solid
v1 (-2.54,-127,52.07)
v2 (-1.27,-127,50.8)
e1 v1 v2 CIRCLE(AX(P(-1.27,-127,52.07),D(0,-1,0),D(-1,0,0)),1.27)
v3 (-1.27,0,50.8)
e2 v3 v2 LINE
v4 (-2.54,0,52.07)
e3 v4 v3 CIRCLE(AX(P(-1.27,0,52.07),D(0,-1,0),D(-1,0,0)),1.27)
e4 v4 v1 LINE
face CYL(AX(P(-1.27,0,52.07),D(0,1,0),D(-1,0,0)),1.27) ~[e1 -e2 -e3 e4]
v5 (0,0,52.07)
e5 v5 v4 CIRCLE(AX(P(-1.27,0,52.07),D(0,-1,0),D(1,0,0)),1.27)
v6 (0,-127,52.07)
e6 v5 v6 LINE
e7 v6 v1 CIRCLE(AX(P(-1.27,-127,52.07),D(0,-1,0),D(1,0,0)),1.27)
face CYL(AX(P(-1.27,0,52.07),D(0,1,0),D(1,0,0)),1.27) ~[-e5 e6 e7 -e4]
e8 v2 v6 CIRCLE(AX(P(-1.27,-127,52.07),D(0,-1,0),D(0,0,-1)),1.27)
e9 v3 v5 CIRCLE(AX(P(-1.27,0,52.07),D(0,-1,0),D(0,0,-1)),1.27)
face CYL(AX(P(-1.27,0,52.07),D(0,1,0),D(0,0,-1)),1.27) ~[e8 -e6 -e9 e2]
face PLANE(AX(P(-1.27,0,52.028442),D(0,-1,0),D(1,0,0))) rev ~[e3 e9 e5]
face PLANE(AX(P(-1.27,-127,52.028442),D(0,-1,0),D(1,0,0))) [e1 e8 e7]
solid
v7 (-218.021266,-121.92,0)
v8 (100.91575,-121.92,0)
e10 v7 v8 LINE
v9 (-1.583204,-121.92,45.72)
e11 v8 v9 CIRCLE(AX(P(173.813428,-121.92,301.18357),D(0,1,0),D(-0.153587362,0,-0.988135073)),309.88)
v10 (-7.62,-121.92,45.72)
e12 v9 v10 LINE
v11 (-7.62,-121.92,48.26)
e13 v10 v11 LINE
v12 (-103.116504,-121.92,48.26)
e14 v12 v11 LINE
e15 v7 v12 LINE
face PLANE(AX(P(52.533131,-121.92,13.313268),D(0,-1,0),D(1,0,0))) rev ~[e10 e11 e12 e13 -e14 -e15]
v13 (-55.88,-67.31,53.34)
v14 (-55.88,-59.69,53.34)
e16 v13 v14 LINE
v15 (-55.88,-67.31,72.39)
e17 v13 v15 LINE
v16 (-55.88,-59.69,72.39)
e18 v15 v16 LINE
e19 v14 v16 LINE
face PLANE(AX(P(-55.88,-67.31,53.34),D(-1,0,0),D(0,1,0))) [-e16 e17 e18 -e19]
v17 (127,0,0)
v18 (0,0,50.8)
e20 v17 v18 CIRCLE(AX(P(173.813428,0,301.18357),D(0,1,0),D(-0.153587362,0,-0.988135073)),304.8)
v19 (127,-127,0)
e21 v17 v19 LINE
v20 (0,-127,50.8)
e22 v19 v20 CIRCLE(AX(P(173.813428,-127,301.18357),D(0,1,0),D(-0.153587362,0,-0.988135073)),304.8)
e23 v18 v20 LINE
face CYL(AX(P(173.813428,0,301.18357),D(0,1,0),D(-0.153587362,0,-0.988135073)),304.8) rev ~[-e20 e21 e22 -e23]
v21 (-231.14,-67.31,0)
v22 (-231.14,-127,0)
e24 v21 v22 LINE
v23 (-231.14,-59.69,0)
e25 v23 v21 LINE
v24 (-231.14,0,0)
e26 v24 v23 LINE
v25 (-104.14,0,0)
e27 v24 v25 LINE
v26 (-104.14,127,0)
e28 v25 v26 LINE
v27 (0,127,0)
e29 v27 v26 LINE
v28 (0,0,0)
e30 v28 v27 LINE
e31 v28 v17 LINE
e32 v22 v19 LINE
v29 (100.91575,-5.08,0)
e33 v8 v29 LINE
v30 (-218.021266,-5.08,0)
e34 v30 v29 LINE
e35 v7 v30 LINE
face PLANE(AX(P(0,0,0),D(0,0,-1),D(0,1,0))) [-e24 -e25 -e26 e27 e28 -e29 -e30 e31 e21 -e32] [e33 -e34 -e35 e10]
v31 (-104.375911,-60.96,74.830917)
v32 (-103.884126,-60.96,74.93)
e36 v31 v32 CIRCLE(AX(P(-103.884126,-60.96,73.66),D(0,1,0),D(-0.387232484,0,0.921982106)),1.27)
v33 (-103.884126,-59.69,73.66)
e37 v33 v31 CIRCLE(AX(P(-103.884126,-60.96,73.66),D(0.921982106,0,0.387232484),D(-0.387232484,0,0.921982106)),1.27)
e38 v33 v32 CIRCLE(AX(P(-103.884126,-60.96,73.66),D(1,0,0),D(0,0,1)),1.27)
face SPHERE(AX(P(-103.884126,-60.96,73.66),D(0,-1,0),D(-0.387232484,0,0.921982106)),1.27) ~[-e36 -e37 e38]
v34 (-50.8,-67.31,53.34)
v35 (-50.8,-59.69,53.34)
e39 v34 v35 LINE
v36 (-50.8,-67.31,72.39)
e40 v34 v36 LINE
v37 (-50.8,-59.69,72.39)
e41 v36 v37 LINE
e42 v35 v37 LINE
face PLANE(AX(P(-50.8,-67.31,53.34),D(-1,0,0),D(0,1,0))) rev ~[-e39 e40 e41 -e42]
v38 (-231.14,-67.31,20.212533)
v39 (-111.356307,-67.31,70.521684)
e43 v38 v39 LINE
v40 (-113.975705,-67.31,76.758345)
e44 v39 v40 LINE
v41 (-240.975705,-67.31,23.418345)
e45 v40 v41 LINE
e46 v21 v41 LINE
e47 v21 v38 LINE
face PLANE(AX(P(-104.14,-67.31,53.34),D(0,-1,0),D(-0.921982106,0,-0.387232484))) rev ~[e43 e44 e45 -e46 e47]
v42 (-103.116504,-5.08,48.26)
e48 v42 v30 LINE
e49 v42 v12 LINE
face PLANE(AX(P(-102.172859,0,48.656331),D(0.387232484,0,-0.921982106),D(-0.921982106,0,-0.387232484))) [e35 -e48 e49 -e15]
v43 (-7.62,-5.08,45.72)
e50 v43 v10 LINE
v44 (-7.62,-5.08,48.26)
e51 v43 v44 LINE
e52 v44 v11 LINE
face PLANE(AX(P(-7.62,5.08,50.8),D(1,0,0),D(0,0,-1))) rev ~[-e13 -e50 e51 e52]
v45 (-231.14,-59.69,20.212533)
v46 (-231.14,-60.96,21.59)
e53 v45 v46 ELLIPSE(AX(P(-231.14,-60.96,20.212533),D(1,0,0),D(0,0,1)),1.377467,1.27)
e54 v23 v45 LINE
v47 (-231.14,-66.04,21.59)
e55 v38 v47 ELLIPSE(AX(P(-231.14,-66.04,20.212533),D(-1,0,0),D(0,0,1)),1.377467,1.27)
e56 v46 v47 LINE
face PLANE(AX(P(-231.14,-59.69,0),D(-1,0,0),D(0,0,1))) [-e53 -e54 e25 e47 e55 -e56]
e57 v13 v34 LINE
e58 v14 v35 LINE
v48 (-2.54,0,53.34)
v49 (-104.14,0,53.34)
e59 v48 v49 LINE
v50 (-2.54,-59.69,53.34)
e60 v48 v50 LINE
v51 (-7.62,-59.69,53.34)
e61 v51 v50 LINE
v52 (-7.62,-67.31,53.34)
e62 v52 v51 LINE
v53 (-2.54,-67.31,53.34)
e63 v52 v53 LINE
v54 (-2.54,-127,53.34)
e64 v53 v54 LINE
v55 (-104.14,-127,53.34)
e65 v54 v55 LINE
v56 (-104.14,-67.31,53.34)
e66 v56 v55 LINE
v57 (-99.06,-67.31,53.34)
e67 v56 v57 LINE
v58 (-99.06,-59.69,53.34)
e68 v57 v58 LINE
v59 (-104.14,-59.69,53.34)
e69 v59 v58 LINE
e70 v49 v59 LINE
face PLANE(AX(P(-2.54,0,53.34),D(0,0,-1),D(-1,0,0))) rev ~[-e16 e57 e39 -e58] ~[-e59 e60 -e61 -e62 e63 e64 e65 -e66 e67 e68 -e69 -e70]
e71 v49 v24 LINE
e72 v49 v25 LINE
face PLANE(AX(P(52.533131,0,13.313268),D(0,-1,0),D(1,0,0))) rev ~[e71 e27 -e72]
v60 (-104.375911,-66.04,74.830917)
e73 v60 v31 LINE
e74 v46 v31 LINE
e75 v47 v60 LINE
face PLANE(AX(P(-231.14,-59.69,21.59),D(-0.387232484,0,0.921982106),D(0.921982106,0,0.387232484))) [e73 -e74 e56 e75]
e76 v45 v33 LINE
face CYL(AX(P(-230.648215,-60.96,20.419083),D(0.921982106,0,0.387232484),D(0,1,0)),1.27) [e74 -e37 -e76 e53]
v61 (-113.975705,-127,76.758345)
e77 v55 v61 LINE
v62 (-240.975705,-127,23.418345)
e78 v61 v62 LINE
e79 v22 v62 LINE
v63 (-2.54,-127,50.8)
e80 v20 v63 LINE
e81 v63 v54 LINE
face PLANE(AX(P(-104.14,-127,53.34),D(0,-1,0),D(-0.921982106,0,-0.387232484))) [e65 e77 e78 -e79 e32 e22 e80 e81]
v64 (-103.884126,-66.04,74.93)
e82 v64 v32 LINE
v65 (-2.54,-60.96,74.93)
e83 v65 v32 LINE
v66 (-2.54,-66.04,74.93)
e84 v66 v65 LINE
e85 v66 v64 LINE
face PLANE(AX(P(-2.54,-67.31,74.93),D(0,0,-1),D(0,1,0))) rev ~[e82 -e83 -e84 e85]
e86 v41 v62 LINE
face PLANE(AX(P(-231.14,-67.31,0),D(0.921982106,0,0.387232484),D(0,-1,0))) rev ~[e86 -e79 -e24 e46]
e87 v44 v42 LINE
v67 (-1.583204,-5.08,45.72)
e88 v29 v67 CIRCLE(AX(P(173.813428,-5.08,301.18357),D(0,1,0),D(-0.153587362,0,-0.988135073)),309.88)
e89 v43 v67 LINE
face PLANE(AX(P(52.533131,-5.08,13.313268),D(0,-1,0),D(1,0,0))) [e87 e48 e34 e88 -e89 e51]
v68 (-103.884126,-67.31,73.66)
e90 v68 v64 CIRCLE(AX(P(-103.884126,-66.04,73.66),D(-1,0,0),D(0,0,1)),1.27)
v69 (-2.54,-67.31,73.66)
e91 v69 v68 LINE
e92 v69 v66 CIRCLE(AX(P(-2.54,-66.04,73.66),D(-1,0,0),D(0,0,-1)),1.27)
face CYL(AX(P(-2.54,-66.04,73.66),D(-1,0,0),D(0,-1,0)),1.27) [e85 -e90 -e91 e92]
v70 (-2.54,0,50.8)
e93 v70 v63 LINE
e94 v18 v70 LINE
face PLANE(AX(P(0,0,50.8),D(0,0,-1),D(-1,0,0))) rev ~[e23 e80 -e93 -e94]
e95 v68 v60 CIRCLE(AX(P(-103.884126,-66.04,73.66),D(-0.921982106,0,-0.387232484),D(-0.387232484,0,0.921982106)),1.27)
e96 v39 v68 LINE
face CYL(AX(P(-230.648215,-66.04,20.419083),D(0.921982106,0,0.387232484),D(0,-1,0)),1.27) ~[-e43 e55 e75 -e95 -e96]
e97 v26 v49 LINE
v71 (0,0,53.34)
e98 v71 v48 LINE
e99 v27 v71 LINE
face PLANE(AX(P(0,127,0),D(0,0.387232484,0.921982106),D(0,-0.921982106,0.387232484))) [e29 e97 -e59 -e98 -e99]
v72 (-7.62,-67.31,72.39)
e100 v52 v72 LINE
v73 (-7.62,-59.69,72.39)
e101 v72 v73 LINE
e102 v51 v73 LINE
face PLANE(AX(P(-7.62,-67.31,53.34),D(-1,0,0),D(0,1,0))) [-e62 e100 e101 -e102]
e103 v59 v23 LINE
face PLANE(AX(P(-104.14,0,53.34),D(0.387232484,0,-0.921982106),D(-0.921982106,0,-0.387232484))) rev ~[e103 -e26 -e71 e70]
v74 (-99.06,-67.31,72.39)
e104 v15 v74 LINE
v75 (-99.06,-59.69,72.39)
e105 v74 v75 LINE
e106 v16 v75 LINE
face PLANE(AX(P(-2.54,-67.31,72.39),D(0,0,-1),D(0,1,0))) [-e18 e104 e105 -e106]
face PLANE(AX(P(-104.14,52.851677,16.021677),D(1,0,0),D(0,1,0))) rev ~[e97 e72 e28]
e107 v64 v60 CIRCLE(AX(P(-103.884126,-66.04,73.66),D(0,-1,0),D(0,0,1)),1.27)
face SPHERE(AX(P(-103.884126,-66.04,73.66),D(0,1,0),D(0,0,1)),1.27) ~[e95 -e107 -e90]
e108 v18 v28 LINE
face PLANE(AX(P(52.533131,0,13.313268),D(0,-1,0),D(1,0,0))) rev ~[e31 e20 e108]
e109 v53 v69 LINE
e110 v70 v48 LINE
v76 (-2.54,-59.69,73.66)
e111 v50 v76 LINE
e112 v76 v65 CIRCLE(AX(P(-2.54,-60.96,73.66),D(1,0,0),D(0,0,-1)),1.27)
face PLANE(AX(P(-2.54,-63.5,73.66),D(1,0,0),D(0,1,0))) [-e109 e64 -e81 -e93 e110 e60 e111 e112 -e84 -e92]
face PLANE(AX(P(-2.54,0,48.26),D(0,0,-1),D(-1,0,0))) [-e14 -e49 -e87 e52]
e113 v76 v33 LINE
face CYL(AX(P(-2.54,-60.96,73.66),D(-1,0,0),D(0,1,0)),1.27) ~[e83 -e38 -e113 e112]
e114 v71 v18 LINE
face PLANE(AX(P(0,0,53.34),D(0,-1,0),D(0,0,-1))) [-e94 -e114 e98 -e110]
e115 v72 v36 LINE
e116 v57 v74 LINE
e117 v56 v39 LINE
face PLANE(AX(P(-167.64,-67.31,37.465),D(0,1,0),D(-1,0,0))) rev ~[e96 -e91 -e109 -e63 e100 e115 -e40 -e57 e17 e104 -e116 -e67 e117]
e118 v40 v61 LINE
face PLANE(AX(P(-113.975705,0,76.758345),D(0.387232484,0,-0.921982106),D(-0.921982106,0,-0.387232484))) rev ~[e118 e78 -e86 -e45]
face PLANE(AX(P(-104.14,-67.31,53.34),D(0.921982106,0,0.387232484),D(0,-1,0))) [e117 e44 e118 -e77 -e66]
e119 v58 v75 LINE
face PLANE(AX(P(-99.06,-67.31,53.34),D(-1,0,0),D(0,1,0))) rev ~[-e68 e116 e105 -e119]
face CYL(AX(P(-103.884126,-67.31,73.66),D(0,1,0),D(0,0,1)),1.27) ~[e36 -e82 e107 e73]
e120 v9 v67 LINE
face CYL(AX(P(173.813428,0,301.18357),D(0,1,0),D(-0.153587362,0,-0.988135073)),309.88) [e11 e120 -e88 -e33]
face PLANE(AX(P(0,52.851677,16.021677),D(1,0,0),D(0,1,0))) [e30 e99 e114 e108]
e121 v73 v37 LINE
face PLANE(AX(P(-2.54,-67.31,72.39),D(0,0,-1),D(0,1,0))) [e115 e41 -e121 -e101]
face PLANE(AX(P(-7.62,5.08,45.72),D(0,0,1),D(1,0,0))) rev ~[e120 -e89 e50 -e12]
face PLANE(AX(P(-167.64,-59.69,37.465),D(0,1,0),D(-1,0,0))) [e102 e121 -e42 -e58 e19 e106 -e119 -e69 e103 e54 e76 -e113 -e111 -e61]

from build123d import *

# Parameters (mm, degrees)
F1_DEPTH     = 127
F2_W         = 5.08
F2_H         = 7.62
F3_DEPTH     = 19.05
F4_W         = 7.62
F4_H         = 2.54
F5_DEPTH     = 101.6
F6_T         = 5.08
F6_T3_DEPTH  = 17.78
F6_T5_DEPTH  = 15.24
F6_T7_DEPTH  = 15.24
F6_T9_DEPTH  = 15.24
F6_T11_DEPTH = 137.16
F8_DEPTH     = 7.62
F10_DEPTH    = 104.14
F11_R        = 1.27
F12_DEPTH    = 25.4


# Not quite as in the source:
# - a shell that OpenCascade refuses in one call is made with other operations: the cavity is built on its own and cut out
# - a feature names something its author has since deleted; it is built from what else it names


with BuildPart() as f1:
    # F0 (on Front) → F1 (new body)
    with BuildSketch(Plane.XZ):
        with BuildLine():
            Line((0, 50.8), (0, 0))
            Line((0, 0), (127, 0))
            ThreePointArc((127, 0), (60.6135499229, 18.1838748072), (0, 50.8))
        make_face()
        Polygon((-104.14, 0), (-2.54, 0), (-2.54, 50.8), (-2.54, 52.07), (-2.54, 53.34), (-104.14, 53.34), align=None)
        Polygon((-2.54, 0), (0, 0), (0, 50.8), (-1.27, 50.8), (-2.54, 50.8), align=None)
        Polygon((-231.14, 0), (-104.14, 0), (-104.14, 53.34), align=None)
    extrude(amount=F1_DEPTH)

    # F2 (on face) → F3 (join)
    with BuildSketch(Plane.XY.offset(53.34)):
        with Locations((-101.6, -63.5)):
            Rectangle(F2_W, F2_H)
        with Locations((-5.08, -63.5)):
            Rectangle(F2_W, F2_H)
        with Locations((-53.34, -63.5)):
            Rectangle(F2_W, F2_H)
    extrude(amount=F3_DEPTH)

    # F4 (on face) → F5 (join)
    with BuildSketch(Plane.YZ.offset(-2.54)):
        with Locations((-63.5, 73.66)):
            Rectangle(F4_W, F4_H)
    extrude(amount=-F5_DEPTH)

    # F6: shell of thickness 5.08, made by hand


with BuildPart() as f1b:
    # F0 (on Front) → F1, piece 2 (new body)
    with BuildSketch(Plane.XZ):
        with BuildLine():
            ThreePointArc((-2.54, 52.07), (-2.1680256121, 51.1719743879), (-1.27, 50.8))
            ThreePointArc((-1.27, 50.8), (-0.3719743879, 51.1719743879), (0, 52.07))
            ThreePointArc((0, 52.07), (-1.27, 53.34), (-2.54, 52.07))
        make_face()
    extrude(amount=F1_DEPTH)


with BuildPart() as f6_core1:
    # F6_t2: copy of F1
    add(f1.part)

    # the walls: a layer under each face that stays
    f6_faces = [f6_core1.faces().sort_by_distance(p)[0] for p in [
        (60.6135499229, -63.5, 18.1838748072),
        (-52.07, -127, 26.67),
        (-167.64, -63.5, 26.67),
        (-104.14, -63.5, 64.135),
        (-53.34, -67.31, 64.135),
        (-99.06, -63.5, 62.865),
        (-77.47, -63.5, 72.39),
        (-55.88, -63.5, 62.865),
        (-50.8, -63.5, 62.865),
        (-29.21, -63.5, 72.39),
        (-7.62, -63.5, 62.865),
        (-53.34, -63.5, 74.93),
        (-53.34, -59.69, 64.135),
        (-19.4733333333, -105.8333333333, 53.34),
        (-2.54, -63.5, 62.865),
        (-52.07, 0, 26.67),
        (-1.27, -63.5, 50.8),
    ]]
    thicken(f6_faces, amount=-F6_T, mode=Mode.SUBTRACT)

    # F6_s4 → F6_t3 (cut)
    with BuildSketch(Plane.XZ.offset(54.61)):
        Polygon((-104.2104714102, 53.386836691), (-102.1728589795, 48.6563309035), (-99.06, 49.9637316749), (-99.06, 53.34), align=None)
        Polygon((-99.0092, 53.3908), (-104.14, 53.34), (-104.14, 48.26), (-99.06, 48.26), align=None)
        Polygon((-99.0092, 72.3392), (-104.14, 72.39), (-104.14, 77.47), (-99.06, 77.47), align=None)
        Polygon((-55.9308, 72.3392), (-55.88, 77.47), (-50.8, 77.47), (-50.8, 72.39), align=None)
        Polygon((-55.9308, 53.3908), (-50.8, 53.34), (-50.8, 48.26), (-55.88, 48.26), align=None)
        Polygon((-50.7492, 53.3908), (-55.88, 53.34), (-55.88, 48.26), (-50.8, 48.26), align=None)
        Polygon((-50.7492, 72.3392), (-55.88, 72.39), (-55.88, 77.47), (-50.8, 77.47), align=None)
        Polygon((-7.6708, 72.3392), (-7.62, 77.47), (-2.54, 77.47), (-2.54, 72.39), align=None)
        Polygon((-7.6708, 53.3908), (-2.54, 53.34), (-2.54, 48.26), (-7.62, 48.26), align=None)
    extrude(amount=F6_T3_DEPTH, mode=Mode.SUBTRACT)

    # F6_s6 → F6_t5 (cut)
    with BuildSketch(Plane.YZ.offset(-60.96)):
        Polygon((-67.3608, 53.3908), (-62.23, 53.34), (-62.23, 48.26), (-67.31, 48.26), align=None)
        Polygon((-59.6392, 53.3908), (-64.77, 53.34), (-64.77, 48.26), (-59.69, 48.26), align=None)
    extrude(amount=F6_T5_DEPTH, mode=Mode.SUBTRACT)

    # F6_s8 → F6_t7 (cut)
    with BuildSketch(Plane.YZ.offset(-109.22)):
        Polygon((-67.3608, 53.3908), (-62.23, 53.34), (-62.23, 48.26), (-67.31, 48.26), align=None)
        Polygon((-59.6392, 53.3908), (-64.77, 53.34), (-64.77, 48.26), (-59.69, 48.26), align=None)
    extrude(amount=F6_T7_DEPTH, mode=Mode.SUBTRACT)

    # F6_s10 → F6_t9 (cut)
    with BuildSketch(Plane.YZ.offset(-12.7)):
        Polygon((-67.3608, 53.3908), (-62.23, 53.34), (-62.23, 48.26), (-67.31, 48.26), align=None)
        Polygon((-59.6392, 53.3908), (-64.77, 53.34), (-64.77, 48.26), (-59.69, 48.26), align=None)
    extrude(amount=F6_T9_DEPTH, mode=Mode.SUBTRACT)

    # F6_s12 → F6_t11 (cut)
    with BuildSketch(Plane.XZ.offset(-5.08)):
        Polygon((-2.4892, 50.8508), (-7.62, 50.8), (-7.62, 45.72), (-2.54, 45.72), align=None)
    extrude(amount=F6_T11_DEPTH, mode=Mode.SUBTRACT)


with BuildPart() as f1_1:
    add(f1.part)

    # what is left inside the walls is the cavity
    f6_cavity = [f6_core1.part.solids().sort_by_distance(p)[0] for p in [
        (-58.552758, -82.973333, 0.0508),
    ]]
    add(f6_cavity, mode=Mode.SUBTRACT)

    # F7 (on face) → F8 (join)
    with BuildSketch(Plane(origin=(0, -59.69, 0), x_dir=(-1, 0, 0), z_dir=(0, 1, 0))):
        Polygon((231.14, 21.59), (104.14, 74.93), (104.14, 53.34), (231.14, 0), align=None)
    extrude(amount=-F8_DEPTH)

    # F9 (on Right) → F10 (join)
    with BuildSketch(Plane.YZ):
        Polygon((127, 0), (0, 53.34), (0, 0), align=None)
    extrude(amount=-F10_DEPTH)

    # F11
    f11_edges = [f1_1.edges().sort_by_distance(p)[0] for p in [
        (-53.34, -67.31, 74.93),
        (-167.64, -67.31, 48.26),
        (-104.14, -63.5, 74.93),
        (-167.64, -59.69, 48.26),
        (-53.34, -59.69, 74.93),
    ]]
    fillet(f11_edges, radius=F11_R)

    # F12 (add): a face of the model
    f12_faces = [f1_1.faces().sort_by_distance(p)[0] for p in [
        (-167.64, -97.155, 26.67),
    ]]
    extrude(f12_faces, amount=F12_DEPTH)


solid = Compound([f1b.part, f1_1.part])
